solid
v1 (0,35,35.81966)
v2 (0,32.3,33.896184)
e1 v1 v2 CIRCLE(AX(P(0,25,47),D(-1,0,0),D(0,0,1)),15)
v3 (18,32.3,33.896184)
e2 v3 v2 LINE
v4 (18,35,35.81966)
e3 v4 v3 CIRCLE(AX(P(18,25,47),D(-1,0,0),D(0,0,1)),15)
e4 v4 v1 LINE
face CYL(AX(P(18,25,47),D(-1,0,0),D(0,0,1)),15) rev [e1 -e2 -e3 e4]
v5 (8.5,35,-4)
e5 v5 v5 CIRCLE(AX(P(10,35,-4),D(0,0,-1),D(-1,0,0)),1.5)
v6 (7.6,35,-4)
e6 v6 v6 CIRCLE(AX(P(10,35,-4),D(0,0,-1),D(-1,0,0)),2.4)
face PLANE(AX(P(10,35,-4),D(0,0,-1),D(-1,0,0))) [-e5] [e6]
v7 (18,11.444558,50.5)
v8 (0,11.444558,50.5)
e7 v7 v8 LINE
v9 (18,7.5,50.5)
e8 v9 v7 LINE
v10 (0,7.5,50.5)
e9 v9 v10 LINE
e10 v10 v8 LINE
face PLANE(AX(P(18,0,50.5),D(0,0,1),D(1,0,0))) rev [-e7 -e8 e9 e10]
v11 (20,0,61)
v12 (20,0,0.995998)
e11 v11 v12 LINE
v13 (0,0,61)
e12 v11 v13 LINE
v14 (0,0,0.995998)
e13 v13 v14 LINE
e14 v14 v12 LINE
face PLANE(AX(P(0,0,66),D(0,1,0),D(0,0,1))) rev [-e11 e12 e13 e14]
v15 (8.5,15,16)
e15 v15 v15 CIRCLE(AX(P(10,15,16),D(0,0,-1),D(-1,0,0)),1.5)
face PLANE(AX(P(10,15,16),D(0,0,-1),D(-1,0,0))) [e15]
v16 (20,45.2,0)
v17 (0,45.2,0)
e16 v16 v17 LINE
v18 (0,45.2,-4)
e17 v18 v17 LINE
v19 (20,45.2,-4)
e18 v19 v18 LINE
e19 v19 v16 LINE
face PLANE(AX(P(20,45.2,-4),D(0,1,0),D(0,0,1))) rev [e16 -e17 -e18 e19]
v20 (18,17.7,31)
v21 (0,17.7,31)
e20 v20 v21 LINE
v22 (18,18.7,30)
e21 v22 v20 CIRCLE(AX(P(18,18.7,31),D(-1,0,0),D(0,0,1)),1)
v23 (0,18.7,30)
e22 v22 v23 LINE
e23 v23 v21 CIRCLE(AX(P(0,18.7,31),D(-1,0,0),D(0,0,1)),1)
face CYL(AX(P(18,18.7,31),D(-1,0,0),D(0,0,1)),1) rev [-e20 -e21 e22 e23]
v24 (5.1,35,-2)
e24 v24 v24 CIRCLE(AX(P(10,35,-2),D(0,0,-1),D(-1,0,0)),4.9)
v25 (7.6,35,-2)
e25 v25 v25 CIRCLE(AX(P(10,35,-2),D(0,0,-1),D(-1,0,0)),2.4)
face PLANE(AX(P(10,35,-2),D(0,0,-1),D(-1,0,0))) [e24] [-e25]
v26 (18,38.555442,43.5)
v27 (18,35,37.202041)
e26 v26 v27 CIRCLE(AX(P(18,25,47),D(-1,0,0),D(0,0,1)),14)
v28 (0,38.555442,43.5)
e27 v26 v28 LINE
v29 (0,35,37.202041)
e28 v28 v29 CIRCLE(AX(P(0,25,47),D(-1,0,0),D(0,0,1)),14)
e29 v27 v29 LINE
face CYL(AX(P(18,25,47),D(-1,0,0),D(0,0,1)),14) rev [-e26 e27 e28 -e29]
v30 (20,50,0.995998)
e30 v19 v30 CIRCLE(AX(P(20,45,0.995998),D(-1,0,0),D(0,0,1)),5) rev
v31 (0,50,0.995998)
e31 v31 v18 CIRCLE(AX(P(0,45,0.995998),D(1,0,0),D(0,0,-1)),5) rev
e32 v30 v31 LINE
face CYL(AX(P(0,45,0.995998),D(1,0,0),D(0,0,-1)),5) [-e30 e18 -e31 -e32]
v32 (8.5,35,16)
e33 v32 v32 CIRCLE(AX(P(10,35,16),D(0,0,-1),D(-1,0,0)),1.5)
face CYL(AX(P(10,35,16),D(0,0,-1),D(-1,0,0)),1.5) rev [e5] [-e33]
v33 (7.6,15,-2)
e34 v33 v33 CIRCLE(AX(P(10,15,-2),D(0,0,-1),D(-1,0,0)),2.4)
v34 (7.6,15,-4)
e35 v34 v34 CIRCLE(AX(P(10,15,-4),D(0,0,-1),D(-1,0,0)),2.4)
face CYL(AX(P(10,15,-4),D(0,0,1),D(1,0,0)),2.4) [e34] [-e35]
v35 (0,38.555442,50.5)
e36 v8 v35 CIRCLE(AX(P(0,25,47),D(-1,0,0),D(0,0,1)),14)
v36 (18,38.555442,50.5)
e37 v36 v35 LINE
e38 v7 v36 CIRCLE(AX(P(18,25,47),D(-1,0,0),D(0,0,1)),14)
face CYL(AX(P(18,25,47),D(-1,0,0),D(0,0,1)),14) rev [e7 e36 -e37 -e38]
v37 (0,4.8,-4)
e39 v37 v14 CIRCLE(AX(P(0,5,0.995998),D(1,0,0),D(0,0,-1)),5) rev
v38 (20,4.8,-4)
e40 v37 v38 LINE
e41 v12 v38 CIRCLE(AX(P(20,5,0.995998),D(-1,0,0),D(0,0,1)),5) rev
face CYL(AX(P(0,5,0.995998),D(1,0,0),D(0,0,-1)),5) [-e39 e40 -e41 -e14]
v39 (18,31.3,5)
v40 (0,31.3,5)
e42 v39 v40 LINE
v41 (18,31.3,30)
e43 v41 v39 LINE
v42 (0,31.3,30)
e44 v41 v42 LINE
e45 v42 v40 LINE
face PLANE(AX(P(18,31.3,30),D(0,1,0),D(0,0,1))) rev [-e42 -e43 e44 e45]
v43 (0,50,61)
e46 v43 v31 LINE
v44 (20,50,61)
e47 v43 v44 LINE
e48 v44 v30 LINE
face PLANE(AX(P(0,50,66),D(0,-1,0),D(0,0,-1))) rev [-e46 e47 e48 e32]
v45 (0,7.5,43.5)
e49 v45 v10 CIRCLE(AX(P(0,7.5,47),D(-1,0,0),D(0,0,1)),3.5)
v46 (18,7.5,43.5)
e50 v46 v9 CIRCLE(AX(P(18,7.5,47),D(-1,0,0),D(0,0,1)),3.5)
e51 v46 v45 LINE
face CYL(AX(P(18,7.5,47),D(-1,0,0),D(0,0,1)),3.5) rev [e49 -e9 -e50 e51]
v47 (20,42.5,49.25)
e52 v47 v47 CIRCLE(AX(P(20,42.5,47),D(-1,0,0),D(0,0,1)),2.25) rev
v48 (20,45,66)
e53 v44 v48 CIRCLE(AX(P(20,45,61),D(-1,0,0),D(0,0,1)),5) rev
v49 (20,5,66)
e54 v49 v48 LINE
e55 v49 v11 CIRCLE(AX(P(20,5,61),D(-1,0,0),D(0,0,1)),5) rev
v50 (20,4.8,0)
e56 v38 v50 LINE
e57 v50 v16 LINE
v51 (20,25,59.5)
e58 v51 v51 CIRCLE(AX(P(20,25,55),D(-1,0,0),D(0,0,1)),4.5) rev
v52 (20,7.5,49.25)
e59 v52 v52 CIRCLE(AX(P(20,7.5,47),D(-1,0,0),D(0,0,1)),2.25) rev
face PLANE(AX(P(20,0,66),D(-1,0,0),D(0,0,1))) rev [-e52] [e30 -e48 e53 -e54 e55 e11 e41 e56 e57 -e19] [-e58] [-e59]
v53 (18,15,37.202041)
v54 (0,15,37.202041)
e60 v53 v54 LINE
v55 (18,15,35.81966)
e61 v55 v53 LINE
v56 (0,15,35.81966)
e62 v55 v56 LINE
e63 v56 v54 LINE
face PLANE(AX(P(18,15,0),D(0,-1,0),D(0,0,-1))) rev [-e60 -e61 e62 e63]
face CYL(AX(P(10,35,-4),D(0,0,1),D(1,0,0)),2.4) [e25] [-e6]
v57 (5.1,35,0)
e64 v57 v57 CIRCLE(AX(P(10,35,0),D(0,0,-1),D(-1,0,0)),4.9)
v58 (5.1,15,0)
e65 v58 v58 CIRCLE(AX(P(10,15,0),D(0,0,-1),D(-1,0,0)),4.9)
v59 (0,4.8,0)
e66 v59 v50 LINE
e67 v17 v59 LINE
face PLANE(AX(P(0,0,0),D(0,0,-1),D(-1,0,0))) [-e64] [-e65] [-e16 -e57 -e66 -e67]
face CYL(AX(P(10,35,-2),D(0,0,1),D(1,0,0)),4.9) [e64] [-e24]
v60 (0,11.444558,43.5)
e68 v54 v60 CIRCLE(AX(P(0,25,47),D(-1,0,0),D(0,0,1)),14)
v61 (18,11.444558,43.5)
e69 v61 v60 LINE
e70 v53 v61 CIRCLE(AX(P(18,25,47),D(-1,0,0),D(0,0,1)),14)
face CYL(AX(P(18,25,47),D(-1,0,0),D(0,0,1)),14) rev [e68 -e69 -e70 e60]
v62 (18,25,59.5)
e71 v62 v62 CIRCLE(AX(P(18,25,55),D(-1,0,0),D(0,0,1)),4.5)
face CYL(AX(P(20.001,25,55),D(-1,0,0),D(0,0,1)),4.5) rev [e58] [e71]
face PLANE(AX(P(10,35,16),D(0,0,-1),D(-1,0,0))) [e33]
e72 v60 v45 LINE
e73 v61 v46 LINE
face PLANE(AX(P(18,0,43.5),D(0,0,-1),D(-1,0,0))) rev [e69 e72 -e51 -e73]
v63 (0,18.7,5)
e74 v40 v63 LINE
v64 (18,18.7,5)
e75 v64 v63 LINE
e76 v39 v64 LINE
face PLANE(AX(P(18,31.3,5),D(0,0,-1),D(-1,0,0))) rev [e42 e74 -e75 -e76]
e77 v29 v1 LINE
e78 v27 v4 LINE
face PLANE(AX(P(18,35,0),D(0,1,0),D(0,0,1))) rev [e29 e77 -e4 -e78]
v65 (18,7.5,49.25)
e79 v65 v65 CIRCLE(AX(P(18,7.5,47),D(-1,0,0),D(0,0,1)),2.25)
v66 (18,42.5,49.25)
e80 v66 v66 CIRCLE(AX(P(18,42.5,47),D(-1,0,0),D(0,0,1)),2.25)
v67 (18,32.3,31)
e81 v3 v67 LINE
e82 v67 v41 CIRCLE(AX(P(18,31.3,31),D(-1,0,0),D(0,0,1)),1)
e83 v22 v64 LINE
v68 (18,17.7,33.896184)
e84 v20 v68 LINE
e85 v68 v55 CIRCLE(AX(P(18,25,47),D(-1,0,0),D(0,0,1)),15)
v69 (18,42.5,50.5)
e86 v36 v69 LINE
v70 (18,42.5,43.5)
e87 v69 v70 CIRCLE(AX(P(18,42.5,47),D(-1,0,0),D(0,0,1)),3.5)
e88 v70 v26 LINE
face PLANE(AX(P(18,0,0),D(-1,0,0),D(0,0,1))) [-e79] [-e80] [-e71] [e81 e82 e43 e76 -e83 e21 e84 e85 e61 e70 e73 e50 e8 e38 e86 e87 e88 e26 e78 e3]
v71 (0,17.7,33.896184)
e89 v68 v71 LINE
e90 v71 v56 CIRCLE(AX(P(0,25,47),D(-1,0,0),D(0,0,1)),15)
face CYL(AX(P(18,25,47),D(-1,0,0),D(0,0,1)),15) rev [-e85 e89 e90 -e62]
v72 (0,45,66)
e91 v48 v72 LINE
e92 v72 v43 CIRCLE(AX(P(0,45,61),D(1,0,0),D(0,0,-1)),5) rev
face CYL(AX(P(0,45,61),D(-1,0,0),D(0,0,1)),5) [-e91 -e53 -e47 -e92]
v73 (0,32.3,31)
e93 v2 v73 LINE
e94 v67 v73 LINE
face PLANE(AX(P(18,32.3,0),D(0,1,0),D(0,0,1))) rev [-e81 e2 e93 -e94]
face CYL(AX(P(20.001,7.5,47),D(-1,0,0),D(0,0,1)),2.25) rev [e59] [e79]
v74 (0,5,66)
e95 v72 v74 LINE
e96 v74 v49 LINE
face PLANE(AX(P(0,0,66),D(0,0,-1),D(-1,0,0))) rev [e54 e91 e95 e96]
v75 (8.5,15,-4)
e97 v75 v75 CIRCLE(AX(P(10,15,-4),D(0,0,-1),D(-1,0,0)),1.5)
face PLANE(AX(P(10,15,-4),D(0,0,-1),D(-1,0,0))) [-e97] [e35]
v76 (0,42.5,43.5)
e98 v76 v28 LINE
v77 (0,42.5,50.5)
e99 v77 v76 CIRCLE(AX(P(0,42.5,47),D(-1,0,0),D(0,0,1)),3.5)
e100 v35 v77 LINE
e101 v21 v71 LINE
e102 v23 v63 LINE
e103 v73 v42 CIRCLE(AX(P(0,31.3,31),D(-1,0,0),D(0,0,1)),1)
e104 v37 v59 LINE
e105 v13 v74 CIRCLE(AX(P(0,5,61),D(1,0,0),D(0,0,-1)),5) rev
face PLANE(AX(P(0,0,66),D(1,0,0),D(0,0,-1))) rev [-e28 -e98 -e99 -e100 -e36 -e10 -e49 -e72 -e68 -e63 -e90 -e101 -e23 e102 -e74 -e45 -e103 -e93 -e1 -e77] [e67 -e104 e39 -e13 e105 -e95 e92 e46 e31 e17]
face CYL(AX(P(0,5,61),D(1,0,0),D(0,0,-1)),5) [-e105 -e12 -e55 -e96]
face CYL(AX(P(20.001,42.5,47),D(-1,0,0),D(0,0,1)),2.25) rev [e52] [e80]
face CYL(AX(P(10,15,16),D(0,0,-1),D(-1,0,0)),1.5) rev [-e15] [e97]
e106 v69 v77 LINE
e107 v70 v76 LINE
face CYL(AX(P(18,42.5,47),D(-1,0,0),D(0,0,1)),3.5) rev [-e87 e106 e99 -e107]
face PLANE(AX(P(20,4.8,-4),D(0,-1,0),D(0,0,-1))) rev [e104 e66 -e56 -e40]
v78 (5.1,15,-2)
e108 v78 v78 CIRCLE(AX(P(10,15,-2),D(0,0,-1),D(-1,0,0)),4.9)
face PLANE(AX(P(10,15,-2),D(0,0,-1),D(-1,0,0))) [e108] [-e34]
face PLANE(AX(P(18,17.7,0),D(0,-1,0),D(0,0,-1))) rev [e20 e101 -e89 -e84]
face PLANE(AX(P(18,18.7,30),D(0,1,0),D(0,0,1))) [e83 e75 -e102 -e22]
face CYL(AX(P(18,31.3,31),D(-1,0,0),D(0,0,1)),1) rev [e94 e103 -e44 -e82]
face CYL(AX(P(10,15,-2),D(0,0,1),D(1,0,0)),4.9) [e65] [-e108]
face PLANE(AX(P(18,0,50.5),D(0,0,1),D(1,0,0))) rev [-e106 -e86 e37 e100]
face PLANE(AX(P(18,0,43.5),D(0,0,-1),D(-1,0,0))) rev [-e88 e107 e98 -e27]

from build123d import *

# Parameters (mm, degrees)
SKETCH1_W           = 20
SKETCH1_H           = 50
BOSS_EXTRUDE1_DEPTH = 66
SKETCH2_R           = 4.9
BOSS_EXTRUDE2_DEPTH = 2
SKETCH3_R           = 2.4
BOSS_EXTRUDE3_DEPTH = 2
SKETCH4_R           = 1.5
CUT_EXTRUDE1_DEPTH  = 20
CUT_EXTRUDE2_START  = -18
CUT_EXTRUDE2_DEPTH  = 18
CUT_EXTRUDE3_REACH  = 86.735
SKETCH8_W           = 20
SKETCH8_H           = 4.8
BOSS_EXTRUDE4_DEPTH = 4
FILLET1_R           = 5


# Read off the part's stored shape, not the designer's step: Cut-Extrude2
with BuildPart() as part:
    # Sketch1 → Boss-Extrude1 (new body)
    with BuildSketch(Plane.XY):
        with Locations((10, 25)):
            Rectangle(SKETCH1_W, SKETCH1_H)
    extrude(amount=BOSS_EXTRUDE1_DEPTH)

    # Sketch2 → Boss-Extrude2 (add)
    with BuildSketch(Plane(origin=(0, 0, 0), x_dir=(-1, 0, 0), z_dir=(0, 0, -1))):
        with Locations((-10, 35)):
            Circle(SKETCH2_R)
        with Locations((-10, 15)):
            Circle(SKETCH2_R)
    extrude(amount=BOSS_EXTRUDE2_DEPTH)

    # Sketch3 → Boss-Extrude3 (add)
    with BuildSketch(Plane(origin=(0, 0, -2), x_dir=(-1, 0, 0), z_dir=(0, 0, -1))):
        with Locations((-10, 15)):
            Circle(SKETCH3_R)
        with Locations((-10, 35)):
            Circle(SKETCH3_R)
    extrude(amount=BOSS_EXTRUDE3_DEPTH)

    # Sketch4 → Cut-Extrude1 (cut)
    with BuildSketch(Plane(origin=(0, 0, -4), x_dir=(-1, 0, 0), z_dir=(0, 0, -1))):
        with Locations((-10, 15)):
            Circle(SKETCH4_R)
        with Locations((-10, 35)):
            Circle(SKETCH4_R)
    extrude(amount=-CUT_EXTRUDE1_DEPTH, mode=Mode.SUBTRACT)

    # Cut-Extrude2 outline → Cut-Extrude2 (cut)
    with BuildSketch(Plane.ZY.offset(CUT_EXTRUDE2_START)):
        with BuildLine():
            ThreePointArc((43.5, 38.555441712), (40.117469968, 37.191422409), (37.202041029, 35))
            Line((37.202041029, 35), (35.819660113, 35))
            ThreePointArc((35.819660113, 35), (34.783103517, 33.703300542), (33.896183762, 32.3))
            Line((33.896183762, 32.3), (31, 32.3))
            ThreePointArc((31, 32.3), (30.292893219, 32.007106781), (30, 31.3))
            Line((30, 31.3), (5, 31.3))
            Line((5, 31.3), (5, 18.7))
            Line((5, 18.7), (30, 18.7))
            ThreePointArc((30, 18.7), (30.292893219, 17.992893219), (31, 17.7))
            Line((31, 17.7), (33.896183762, 17.7))
            ThreePointArc((33.896183762, 17.7), (34.783103517, 16.296699458), (35.819660113, 15))
            Line((35.819660113, 15), (37.202041029, 15))
            ThreePointArc((37.202041029, 15), (40.117469968, 12.808577591), (43.5, 11.444558288))
            Line((43.5, 11.444558288), (43.5, 7.5))
            ThreePointArc((43.5, 7.5), (47, 4), (50.5, 7.5))
            Line((50.5, 7.5), (50.5, 11.444558288))
            ThreePointArc((50.5, 11.444558288), (61, 25), (50.5, 38.555441712))
            Line((50.5, 38.555441712), (50.5, 42.5))
            ThreePointArc((50.5, 42.5), (47, 46), (43.5, 42.5))
            Line((43.5, 42.5), (43.5, 38.555441712))
        make_face()
    extrude(amount=CUT_EXTRUDE2_DEPTH, mode=Mode.SUBTRACT)

    # Sketch7 → Cut-Extrude3 (cut, up to next)
    with BuildSketch(Plane.ZY.offset(-18), mode=Mode.PRIVATE) as cut_extrude3_sk1:
        with BuildLine():
            ThreePointArc((47, 40.25), (49.25, 42.5), (47, 44.75))
            ThreePointArc((47, 44.75), (44.75, 42.5), (47, 40.25))
        make_face()
    cut_extrude3_tool1 = extrude(cut_extrude3_sk1.sketch, amount=-CUT_EXTRUDE3_REACH, mode=Mode.PRIVATE) & part.part
    # Sketch7 → Cut-Extrude3 (cut, up to next)
    with BuildSketch(Plane.ZY.offset(-18), mode=Mode.PRIVATE) as cut_extrude3_sk2:
        with BuildLine():
            ThreePointArc((55, 20.5), (59.5, 25), (55, 29.5))
            ThreePointArc((55, 29.5), (50.5, 25), (55, 20.5))
        make_face()
    cut_extrude3_tool2 = extrude(cut_extrude3_sk2.sketch, amount=-CUT_EXTRUDE3_REACH, mode=Mode.PRIVATE) & part.part
    # Sketch7 → Cut-Extrude3 (cut, up to next)
    with BuildSketch(Plane.ZY.offset(-18), mode=Mode.PRIVATE) as cut_extrude3_sk3:
        with BuildLine():
            ThreePointArc((47, 5.25), (49.25, 7.5), (47, 9.75))
            ThreePointArc((47, 9.75), (44.75, 7.5), (47, 5.25))
        make_face()
    cut_extrude3_tool3 = extrude(cut_extrude3_sk3.sketch, amount=-CUT_EXTRUDE3_REACH, mode=Mode.PRIVATE) & part.part
    add(cut_extrude3_tool1.solids().sort_by_distance((18, 42.5, 47))[0], mode=Mode.SUBTRACT)
    add(cut_extrude3_tool2.solids().sort_by_distance((18, 25, 55))[0], mode=Mode.SUBTRACT)
    add(cut_extrude3_tool3.solids().sort_by_distance((18, 7.5, 47))[0], mode=Mode.SUBTRACT)

    # Sketch8 → Boss-Extrude4 (add)
    with BuildSketch(Plane(origin=(0, 0, 0), x_dir=(-1, 0, 0), z_dir=(0, 0, -1))):
        with Locations((-10, 2.4)):
            Rectangle(SKETCH8_W, SKETCH8_H)
        with Locations((-10, 47.6)):
            Rectangle(SKETCH8_W, SKETCH8_H)
    extrude(amount=BOSS_EXTRUDE4_DEPTH)

    # Fillet1
    # the kernel refuses this fillet: 5 mm, written as the material it takes off along each edge
    with BuildSketch(Plane(origin=(32.489995997, 0, -4), x_dir=(0, 0, 1), z_dir=(-1, 0, 0))) as fillet1_piece_1:
        with BuildLine():
            CenterArc((4.995998399, 5), FILLET1_R, 182.292442776, 87.707557224)
            Line((0, 4.8), (-0.099919968, 4.796))
            ThreePointArc((-0.099919968, 4.796), (-0.1, 2.4), (-0.1, 0))
            Line((-0.1, 0), (0, -0.1))
            Line((0, -0.1), (4.995998399, -0.1))
            Line((4.995998399, -0.1), (4.995998399, 0))
        make_face()
    extrude(amount=44.979991994, mode=Mode.SUBTRACT)
    with BuildSketch(Plane(origin=(32.489995997, 50, -4), x_dir=(0, -1, 0), z_dir=(-1, 0, 0))) as fillet1_piece_2:
        with BuildLine():
            CenterArc((5, 4.995998399), FILLET1_R, 180, 87.707557224)
            Line((0, 4.995998399), (-0.1, 4.995998399))
            Line((-0.1, 4.995998399), (-0.1, 0))
            Line((-0.1, 0), (0, -0.1))
            ThreePointArc((0, -0.1), (2.4, -0.1), (4.796, -0.099919968))
            Line((4.796, -0.099919968), (4.8, 0))
        make_face()
    extrude(amount=44.979991994, mode=Mode.SUBTRACT)
    with BuildSketch(Plane(origin=(32.5, 50, 66), x_dir=(0, 0, -1), z_dir=(-1, 0, 0)), Plane(origin=(-12.5, 0, 66), x_dir=(0, 0, -1), z_dir=(1, 0, 0))) as fillet1_piece_3:
        with BuildLine():
            CenterArc((FILLET1_R, FILLET1_R), FILLET1_R, 180, 90)
            Line((0, FILLET1_R), (-FILLET1_R * 0.02, FILLET1_R))
            Line((-FILLET1_R * 0.02, FILLET1_R), (-FILLET1_R * 0.02, -FILLET1_R * 0.02))
            Line((-FILLET1_R * 0.02, -FILLET1_R * 0.02), (FILLET1_R, -FILLET1_R * 0.02))
            Line((FILLET1_R, -FILLET1_R * 0.02), (FILLET1_R, 0))
        make_face()
    extrude(amount=45, mode=Mode.SUBTRACT)


solid = part.part
